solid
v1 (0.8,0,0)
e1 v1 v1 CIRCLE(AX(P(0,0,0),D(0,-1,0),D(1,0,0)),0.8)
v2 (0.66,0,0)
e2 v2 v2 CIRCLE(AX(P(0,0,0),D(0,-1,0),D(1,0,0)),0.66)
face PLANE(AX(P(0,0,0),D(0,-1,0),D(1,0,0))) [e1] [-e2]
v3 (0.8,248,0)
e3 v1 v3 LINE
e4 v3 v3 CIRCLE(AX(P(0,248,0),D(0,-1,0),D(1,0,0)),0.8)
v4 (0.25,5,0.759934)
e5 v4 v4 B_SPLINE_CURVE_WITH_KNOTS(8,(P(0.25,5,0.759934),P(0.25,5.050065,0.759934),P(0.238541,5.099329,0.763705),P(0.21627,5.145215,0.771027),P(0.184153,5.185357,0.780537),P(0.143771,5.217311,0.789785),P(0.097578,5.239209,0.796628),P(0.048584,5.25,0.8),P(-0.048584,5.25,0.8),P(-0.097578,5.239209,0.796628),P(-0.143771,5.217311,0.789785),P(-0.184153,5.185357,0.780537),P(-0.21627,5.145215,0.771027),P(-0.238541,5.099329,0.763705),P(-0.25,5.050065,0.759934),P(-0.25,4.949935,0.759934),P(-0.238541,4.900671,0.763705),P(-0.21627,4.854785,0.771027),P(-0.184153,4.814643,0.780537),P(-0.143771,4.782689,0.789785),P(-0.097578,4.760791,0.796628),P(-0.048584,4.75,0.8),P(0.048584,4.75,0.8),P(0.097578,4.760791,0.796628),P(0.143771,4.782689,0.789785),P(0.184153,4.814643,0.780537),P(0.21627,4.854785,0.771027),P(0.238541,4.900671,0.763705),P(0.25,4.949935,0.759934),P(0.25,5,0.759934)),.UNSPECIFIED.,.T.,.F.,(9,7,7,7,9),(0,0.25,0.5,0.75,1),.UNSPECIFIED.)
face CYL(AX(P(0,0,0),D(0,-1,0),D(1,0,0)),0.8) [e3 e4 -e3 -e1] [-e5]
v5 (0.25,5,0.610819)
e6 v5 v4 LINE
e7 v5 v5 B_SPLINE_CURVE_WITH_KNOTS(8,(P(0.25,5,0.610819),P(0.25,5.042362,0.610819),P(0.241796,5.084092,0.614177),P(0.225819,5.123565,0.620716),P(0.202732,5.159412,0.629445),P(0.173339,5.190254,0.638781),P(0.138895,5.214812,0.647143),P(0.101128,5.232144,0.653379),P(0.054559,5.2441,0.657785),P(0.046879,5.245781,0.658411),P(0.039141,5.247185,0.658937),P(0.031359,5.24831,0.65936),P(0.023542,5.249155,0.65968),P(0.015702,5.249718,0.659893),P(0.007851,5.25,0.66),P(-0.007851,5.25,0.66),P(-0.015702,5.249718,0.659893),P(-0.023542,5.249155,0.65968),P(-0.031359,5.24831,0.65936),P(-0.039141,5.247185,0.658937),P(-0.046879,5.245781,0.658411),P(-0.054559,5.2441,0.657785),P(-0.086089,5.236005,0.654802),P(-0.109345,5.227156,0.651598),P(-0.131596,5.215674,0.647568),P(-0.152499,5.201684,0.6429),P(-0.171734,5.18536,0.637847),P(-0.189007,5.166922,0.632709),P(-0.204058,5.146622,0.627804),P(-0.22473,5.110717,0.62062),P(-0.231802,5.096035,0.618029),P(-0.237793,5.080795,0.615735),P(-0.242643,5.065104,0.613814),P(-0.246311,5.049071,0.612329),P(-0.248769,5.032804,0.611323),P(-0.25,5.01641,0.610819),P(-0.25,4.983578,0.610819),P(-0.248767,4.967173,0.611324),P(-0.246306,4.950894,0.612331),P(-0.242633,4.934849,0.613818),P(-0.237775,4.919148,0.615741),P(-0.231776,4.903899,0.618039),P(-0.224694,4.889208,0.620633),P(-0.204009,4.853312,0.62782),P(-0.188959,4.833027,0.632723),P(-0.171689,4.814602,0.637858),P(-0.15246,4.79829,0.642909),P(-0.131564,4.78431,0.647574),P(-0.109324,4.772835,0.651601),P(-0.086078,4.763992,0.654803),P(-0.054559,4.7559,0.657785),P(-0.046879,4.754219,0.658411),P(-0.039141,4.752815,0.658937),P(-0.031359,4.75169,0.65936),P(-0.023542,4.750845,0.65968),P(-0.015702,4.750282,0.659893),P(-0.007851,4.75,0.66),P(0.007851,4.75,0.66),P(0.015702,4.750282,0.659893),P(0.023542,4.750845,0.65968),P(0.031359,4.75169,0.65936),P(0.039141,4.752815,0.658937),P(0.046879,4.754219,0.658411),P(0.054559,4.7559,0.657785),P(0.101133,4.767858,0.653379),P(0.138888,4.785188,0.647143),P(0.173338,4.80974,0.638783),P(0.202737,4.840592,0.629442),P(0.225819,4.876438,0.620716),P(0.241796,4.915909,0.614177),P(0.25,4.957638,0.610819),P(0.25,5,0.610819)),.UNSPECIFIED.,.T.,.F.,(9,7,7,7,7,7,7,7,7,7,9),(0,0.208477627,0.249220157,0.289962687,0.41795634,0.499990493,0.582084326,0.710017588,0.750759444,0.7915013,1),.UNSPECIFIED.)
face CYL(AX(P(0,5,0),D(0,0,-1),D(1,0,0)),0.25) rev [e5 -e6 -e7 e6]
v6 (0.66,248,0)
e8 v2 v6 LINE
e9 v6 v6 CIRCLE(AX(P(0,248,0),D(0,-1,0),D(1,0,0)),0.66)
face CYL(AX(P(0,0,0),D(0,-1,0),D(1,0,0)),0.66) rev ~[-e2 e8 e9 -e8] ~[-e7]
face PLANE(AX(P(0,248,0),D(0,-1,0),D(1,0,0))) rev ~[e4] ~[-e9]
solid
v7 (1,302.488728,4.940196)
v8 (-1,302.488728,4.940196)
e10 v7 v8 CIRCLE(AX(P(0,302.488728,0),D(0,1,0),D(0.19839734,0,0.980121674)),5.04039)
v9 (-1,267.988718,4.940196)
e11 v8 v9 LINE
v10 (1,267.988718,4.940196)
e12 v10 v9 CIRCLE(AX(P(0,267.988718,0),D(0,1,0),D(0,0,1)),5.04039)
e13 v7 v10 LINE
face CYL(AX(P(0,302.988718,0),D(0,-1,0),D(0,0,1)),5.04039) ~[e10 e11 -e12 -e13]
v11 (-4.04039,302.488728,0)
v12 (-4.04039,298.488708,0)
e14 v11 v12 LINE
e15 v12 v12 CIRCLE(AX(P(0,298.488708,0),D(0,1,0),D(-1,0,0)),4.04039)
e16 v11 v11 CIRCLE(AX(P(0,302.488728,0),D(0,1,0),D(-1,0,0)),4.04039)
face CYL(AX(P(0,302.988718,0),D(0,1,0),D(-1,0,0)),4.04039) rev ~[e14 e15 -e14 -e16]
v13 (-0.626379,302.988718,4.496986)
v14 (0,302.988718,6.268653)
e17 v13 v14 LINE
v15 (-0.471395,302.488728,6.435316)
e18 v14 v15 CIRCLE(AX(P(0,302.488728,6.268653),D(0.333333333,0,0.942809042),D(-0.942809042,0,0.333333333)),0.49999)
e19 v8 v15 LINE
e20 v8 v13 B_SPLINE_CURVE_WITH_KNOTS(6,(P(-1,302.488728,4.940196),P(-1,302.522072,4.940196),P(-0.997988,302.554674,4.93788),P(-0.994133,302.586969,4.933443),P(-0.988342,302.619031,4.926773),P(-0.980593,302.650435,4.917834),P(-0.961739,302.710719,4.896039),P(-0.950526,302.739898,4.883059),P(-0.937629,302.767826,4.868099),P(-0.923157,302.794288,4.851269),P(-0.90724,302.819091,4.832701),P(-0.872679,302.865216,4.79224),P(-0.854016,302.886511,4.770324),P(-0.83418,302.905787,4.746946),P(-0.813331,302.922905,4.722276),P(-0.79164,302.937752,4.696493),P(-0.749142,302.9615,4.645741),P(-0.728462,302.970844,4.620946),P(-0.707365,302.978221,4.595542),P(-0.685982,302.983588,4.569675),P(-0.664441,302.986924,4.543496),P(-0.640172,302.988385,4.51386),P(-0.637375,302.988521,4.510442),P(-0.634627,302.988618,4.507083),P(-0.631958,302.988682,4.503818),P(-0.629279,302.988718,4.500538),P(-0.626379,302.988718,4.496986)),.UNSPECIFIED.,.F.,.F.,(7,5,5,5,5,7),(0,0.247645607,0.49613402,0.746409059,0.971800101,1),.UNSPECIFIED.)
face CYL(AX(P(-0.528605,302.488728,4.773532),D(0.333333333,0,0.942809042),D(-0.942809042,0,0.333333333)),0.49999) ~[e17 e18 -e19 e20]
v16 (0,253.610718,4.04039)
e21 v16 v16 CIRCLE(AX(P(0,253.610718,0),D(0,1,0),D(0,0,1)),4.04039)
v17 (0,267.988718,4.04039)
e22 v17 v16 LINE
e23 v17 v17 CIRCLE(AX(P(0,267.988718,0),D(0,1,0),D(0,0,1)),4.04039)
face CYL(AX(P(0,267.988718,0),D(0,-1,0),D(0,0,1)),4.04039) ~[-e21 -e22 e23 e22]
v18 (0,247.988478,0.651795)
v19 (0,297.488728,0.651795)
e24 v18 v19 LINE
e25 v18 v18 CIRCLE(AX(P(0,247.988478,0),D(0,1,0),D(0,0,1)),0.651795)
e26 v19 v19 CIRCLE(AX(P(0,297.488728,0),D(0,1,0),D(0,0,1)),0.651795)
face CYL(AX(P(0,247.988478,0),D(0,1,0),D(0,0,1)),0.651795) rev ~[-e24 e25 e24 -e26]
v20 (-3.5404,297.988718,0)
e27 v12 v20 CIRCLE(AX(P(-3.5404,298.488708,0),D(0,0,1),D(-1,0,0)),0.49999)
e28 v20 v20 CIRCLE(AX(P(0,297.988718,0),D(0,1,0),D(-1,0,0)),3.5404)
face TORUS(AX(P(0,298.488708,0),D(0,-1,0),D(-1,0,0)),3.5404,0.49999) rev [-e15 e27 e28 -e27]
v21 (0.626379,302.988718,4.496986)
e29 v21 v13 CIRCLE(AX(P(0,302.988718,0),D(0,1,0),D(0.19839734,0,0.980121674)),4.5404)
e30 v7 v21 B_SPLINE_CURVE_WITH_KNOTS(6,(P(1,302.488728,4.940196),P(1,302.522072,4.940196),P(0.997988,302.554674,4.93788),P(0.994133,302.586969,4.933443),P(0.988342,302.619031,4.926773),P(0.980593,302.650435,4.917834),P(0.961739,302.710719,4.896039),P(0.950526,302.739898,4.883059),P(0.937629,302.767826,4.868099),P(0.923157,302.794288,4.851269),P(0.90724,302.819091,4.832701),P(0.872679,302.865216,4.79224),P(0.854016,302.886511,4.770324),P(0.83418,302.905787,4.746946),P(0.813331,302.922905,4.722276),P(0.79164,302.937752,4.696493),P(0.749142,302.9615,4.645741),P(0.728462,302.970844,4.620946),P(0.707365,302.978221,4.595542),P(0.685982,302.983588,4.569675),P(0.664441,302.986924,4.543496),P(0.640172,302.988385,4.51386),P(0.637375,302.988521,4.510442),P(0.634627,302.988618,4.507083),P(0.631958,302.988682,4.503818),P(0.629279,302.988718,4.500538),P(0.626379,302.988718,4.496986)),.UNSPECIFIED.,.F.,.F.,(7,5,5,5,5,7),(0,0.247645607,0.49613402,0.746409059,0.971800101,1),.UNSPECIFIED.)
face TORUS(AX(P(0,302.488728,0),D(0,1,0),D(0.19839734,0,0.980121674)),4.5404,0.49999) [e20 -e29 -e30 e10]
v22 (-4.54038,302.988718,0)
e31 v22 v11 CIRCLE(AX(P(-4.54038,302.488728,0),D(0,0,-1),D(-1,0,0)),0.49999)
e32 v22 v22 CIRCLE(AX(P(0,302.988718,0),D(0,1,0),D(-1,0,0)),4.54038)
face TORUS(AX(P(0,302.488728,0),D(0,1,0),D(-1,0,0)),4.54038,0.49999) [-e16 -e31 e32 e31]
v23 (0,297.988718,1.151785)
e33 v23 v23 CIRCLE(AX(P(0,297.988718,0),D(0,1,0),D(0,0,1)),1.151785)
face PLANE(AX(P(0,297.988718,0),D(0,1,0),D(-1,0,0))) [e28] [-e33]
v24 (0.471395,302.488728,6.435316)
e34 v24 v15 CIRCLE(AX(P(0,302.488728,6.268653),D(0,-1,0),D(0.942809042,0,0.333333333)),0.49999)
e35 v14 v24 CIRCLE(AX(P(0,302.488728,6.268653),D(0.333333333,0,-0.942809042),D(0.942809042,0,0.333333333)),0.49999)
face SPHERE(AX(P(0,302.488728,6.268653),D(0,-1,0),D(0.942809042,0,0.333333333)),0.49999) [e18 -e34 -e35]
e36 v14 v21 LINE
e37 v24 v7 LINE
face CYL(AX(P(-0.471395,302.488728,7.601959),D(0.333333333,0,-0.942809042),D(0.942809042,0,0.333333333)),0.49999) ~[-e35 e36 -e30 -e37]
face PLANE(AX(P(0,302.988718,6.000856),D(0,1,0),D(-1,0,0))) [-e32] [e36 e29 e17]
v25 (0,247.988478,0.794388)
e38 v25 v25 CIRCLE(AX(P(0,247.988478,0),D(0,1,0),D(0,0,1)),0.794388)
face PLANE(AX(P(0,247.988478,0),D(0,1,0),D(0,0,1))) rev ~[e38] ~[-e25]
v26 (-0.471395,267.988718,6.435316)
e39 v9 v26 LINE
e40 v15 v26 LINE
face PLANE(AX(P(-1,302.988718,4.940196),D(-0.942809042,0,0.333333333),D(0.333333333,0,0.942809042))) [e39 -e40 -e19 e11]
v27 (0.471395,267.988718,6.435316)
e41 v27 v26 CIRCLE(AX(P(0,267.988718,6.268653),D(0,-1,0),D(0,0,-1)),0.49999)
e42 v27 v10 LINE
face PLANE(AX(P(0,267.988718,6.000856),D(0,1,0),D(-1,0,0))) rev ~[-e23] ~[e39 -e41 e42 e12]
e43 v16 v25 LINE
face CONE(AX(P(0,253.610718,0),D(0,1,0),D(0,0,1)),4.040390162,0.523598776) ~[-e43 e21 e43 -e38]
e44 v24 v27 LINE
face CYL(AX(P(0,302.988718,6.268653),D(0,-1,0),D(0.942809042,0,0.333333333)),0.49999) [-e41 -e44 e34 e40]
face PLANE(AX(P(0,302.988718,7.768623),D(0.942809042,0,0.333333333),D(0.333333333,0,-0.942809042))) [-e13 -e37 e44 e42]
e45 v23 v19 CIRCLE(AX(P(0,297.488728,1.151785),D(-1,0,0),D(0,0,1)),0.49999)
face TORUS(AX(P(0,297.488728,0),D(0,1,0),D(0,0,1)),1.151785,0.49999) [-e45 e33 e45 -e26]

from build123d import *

# Parameters (mm, degrees)
F0_R     = 0.8
F0_R_2   = 0.66
F1_DEPTH = 248
F2_R     = 0.25
F3_DEPTH = 1
F7_R     = 4.040390162
F8_DEPTH = 5
F9_DEPTH = 35
F10_R    = 0.49999


# Not quite as in the source:
# - a fillet or chamfer is up to 0.001 mm smaller than in the source, because OpenCascade refuses the exact size


with BuildPart() as f1:
    # F0 (on Front) → F1 (new body)
    with BuildSketch(Plane.XZ):
        Circle(F0_R)
        Circle(F0_R_2, mode=Mode.SUBTRACT)
    extrude(amount=-F1_DEPTH)

    # F2 (on Top) → F3 (cut)
    with BuildSketch(Plane.XY):
        with Locations((0, 5)):
            Circle(F2_R)
    extrude(amount=F3_DEPTH, mode=Mode.SUBTRACT)


with BuildPart() as f5:
    # F4 (on Right) → F5 (revolve)
    with BuildSketch(Plane.YZ):
        Polygon((253.6107184147, 4.040390162), (247.9884784147, 0.7943883846), (247.9884784147, 0.6517949142), (302.9887184147, 0.6517949142), (302.9887184147, 5.040390162), (267.9887184147, 5.040390162), (267.9887184147, 4.040390162), align=None)
    revolve(axis=Axis((0, 127.867102623, 0), (0, 1, 0)))

    # F7 (on offset) → F8 (cut)
    with BuildSketch(Plane(origin=(0, 302.9887184147, 0), x_dir=(-1, 0, 0), z_dir=(0, 1, 0))):
        Circle(F7_R)
    extrude(amount=-F8_DEPTH, mode=Mode.SUBTRACT)

    # F7 (on offset) → F9 (join)
    with BuildSketch(Plane(origin=(0, 302.9887184147, 0), x_dir=(-1, 0, 0), z_dir=(0, 1, 0))):
        Polygon((0, 7.7686227672), (-1, 4.9401956424), (1, 4.9401956424), align=None)
    extrude(amount=-F9_DEPTH)

    # F10 (radius 0.5 in the source; OpenCascade refuses exactly that, so slightly less here)
    f10_edges = [f5.edges().sort_by_distance(p)[0] for p in [
        (0, 302.988718, -5.04039),
        (4.04039, 302.988718, 0),
        (4.04039, 297.988718, 0),
        (0, 297.988718, -0.651795),
        (0.5, 302.988718, 6.354409),
        (-0.5, 302.988718, 6.354409),
        (0, 285.488718, 7.768623),
    ]]
    fillet(f10_edges, radius=F10_R)


solid = Compound([f1.part, f5.part])
